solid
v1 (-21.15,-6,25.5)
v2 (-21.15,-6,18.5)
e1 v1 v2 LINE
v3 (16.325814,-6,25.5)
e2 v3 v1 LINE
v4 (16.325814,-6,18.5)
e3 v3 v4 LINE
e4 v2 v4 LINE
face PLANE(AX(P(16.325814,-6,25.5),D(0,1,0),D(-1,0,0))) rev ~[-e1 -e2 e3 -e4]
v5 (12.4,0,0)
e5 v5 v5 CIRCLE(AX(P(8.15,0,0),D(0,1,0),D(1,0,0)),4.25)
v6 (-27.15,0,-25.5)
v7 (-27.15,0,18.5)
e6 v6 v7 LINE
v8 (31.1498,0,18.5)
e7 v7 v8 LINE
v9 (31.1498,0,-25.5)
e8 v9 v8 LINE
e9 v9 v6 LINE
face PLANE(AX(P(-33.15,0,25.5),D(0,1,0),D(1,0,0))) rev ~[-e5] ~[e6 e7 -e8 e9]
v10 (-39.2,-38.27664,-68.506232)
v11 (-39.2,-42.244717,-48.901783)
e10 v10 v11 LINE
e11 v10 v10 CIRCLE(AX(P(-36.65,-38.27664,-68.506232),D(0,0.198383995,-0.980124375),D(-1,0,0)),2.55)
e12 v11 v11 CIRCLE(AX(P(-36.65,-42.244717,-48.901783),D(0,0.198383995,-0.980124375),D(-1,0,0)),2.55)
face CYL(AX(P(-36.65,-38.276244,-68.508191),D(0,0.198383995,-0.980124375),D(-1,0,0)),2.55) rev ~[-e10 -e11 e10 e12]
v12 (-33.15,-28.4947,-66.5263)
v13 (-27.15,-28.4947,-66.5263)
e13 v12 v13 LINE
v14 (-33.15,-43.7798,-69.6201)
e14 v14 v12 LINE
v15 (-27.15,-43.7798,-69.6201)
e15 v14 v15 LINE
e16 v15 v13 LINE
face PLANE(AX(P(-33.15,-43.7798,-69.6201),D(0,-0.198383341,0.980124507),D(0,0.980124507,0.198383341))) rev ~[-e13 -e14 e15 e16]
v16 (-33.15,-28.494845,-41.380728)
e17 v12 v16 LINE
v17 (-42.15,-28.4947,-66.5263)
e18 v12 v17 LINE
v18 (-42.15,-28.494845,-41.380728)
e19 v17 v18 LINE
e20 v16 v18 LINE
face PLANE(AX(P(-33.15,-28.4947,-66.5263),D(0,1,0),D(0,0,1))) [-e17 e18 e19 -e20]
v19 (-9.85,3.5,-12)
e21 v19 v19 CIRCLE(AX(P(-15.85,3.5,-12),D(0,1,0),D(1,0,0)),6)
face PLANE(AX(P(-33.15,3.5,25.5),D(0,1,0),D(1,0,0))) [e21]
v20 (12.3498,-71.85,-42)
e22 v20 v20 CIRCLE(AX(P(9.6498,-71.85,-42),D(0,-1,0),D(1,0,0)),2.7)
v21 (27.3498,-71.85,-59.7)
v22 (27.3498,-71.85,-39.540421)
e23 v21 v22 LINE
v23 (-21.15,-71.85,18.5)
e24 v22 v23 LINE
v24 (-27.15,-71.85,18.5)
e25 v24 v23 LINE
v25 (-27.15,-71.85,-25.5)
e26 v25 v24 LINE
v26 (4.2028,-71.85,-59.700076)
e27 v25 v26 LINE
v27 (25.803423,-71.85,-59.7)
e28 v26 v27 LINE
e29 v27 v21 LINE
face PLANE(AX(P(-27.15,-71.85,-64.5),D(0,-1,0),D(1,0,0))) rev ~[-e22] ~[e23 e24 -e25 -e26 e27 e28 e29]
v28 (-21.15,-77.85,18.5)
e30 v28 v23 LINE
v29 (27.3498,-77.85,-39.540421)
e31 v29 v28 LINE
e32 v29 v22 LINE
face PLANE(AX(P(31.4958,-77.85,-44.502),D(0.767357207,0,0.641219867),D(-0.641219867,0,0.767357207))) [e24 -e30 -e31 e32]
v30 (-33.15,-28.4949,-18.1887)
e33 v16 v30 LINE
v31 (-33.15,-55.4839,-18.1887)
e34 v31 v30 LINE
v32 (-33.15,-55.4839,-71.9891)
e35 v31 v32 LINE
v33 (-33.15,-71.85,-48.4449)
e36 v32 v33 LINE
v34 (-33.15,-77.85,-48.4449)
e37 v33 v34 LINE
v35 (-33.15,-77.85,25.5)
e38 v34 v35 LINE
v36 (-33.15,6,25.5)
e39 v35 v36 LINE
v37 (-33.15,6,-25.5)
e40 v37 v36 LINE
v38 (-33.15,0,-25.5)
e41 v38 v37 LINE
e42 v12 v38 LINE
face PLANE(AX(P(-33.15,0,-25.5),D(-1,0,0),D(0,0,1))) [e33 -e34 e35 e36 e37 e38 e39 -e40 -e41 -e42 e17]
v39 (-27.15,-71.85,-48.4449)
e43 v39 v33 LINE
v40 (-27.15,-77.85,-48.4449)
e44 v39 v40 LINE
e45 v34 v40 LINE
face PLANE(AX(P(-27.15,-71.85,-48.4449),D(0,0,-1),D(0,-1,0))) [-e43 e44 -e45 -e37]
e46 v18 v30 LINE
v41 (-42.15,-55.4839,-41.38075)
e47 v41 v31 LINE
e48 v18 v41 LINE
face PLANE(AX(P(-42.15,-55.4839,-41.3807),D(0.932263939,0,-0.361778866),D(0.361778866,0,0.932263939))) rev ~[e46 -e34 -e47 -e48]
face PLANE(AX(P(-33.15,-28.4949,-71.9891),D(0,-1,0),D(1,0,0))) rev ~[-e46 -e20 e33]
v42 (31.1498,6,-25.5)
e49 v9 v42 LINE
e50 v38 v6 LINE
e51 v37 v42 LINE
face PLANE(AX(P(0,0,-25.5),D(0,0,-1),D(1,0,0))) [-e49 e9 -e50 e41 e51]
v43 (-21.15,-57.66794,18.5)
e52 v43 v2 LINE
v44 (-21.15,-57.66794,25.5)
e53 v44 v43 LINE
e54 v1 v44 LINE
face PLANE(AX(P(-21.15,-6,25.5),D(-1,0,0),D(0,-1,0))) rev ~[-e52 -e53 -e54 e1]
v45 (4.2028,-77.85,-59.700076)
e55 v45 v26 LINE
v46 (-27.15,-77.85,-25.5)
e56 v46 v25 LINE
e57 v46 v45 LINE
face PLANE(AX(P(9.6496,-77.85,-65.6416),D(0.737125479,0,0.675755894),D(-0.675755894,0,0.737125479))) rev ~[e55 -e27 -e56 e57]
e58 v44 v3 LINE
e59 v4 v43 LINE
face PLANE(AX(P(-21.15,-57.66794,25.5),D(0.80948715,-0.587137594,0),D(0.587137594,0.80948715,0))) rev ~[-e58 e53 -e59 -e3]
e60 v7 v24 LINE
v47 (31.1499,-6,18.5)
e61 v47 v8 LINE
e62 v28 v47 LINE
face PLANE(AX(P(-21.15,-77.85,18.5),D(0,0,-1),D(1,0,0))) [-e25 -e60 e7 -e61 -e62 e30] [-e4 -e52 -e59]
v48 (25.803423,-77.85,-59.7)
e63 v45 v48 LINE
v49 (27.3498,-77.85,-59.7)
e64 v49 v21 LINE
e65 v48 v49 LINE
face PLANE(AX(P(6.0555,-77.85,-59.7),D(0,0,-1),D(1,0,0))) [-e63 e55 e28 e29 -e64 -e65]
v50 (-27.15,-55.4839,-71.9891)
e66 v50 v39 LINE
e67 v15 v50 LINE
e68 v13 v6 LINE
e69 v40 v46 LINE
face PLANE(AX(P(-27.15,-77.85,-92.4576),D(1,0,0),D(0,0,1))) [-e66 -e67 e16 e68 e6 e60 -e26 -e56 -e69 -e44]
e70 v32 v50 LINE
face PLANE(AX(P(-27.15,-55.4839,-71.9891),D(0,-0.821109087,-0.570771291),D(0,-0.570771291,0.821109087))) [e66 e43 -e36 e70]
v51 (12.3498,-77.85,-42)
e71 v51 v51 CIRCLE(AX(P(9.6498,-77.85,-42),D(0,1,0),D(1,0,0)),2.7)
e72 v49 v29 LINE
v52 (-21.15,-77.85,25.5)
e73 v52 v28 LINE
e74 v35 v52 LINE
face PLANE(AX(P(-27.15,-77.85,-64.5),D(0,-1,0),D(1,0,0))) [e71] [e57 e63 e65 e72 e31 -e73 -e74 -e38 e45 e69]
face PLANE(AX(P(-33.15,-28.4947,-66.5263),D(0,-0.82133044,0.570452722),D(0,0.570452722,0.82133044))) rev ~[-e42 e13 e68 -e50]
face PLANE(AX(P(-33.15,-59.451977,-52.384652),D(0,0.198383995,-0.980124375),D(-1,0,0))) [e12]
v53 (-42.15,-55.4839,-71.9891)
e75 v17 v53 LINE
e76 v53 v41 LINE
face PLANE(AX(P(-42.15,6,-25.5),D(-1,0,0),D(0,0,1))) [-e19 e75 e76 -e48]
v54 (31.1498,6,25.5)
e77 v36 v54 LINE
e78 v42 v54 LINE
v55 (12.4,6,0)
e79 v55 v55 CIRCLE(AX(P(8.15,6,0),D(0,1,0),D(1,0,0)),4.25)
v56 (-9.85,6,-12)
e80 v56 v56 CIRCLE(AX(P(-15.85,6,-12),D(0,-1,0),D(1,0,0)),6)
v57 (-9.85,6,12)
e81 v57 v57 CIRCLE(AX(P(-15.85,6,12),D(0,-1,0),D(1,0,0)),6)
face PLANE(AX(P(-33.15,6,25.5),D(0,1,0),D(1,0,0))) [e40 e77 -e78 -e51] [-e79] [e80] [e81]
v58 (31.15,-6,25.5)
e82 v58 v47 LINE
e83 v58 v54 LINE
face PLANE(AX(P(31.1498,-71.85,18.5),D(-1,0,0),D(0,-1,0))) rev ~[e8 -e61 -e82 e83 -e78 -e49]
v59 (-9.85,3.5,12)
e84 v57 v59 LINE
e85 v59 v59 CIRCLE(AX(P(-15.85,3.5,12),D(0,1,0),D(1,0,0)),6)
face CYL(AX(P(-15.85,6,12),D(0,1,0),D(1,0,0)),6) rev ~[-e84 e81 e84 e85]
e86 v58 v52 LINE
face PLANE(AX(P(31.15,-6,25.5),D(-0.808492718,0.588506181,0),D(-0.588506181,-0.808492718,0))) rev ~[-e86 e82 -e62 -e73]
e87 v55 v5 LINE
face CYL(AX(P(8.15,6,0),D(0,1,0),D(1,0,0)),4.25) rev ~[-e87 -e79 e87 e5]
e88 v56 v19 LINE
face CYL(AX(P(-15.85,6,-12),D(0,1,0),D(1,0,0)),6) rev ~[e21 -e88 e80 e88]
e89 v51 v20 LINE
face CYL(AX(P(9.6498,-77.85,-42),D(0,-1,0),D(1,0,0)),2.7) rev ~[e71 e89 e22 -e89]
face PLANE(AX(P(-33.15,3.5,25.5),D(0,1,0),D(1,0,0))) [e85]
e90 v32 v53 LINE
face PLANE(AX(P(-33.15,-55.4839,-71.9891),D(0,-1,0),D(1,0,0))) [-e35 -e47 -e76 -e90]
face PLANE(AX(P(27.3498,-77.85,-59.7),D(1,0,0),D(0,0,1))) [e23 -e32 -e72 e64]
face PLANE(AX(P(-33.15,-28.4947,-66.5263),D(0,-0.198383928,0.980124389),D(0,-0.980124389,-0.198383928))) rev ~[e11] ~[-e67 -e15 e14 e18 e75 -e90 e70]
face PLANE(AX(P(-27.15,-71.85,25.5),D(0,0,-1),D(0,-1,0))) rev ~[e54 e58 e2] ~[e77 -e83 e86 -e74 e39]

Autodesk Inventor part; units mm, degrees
ref_plane "YZ Plane" through (0, 0, 0) normal (1, 0, 0) x (0, 1, 0)
ref_plane "XZ Plane" through (0, 0, 0) normal (0, 1, 0) x (-1, 0, 0)
ref_plane "XY Plane" through (0, 0, 0) normal (0, 0, 1) x (1, 0, 0)
sketch "Sketch1" plane through (0, 0, 0) normal (0, 1, 0) x (-1, 0, 0)
  line L0 (0, -25.5) -> (-34.15, -25.5)
  line L1 (-34.15, -25.5) -> (-34.15, 0)
  line L2 (-34.15, 0) -> (-34.15, 25.5)
  line L3 (-34.15, 25.5) -> (0, 25.5)
  line L4 (0, 25.5) -> (34.15, 25.5)
  line L5 (34.15, 25.5) -> (34.15, 0)
  line L6 (34.15, 0) -> (34.15, -25.5)
  line L7 (34.15, -25.5) -> (0, -25.5)
  point P0 (0, 0)
extrude "Extrusion1" add sketch "Sketch1" along normal blind 7
sketch "Sketch3" plane through (-34.15, 0, 25.5) normal (0, 0, 1) x (1, 0, 0)
  line L0 (0, 0) -> (0, -78.85)
  point P0 (34.15, 0)
  dimension "d7" = 78.85
sketch "Sketch4" plane through (-34.15, 0, -25.5) normal (-1, 0, 0) x (0, 0, 1)
  line L0 (51, 0) -> (51, -78.85)
  line L1 (51, -78.85) -> (-39, -78.85)
  line L2 (-39, -78.85) -> (-39, -71.85)
  line L3 (0, 0) -> (-39, -71.85)
  line L4 (0, 0) -> (51, 0)
  point P0 (25.5, 0)
  dimension "d10" = 90
  dimension "d11" = 7
extrude "Extrusion2" add sketch "Sketch4" against normal blind 7
sketch "Sketch6" plane through (0, 7, 0) normal (0, 1, 0) x (1, 0, 0)
  line L0 (34.15, -25.5) -> (34.15, 25.5) projected
  line L1 (34.15, 25.5) -> (34.15, 0)
  line L2 (-34.15, 25.5) -> (-34.15, -25.5) projected
  circle A0 centre (8.15, 0) radius 5
  point P0 (0, 0)
  dimension "d20" = 10
extrude "Extrusion4" cut sketch "Sketch6" against normal blind 10
sketch "Sketch7" plane through (-27.15, 0, -25.5) normal (1, 0, 0) x (0, 0, -1)
  line L0 (-51, -78.85) -> (39, -78.85) projected
  line L1 (-51, -78.85) -> (39, -78.85)
  line L2 (39, -78.85) -> (39, -71.85) projected
  line L3 (39, -78.85) -> (39, -71.85)
  line L4 (39, -71.85) -> (-51, -71.85)
  line L5 (-51, 0) -> (-51, -78.85) projected
  line L6 (-51, -78.85) -> (-51, -71.85)
  point P0 (-25.5, 0)
sketch "Sketch8" plane through (0, 0, 0) normal (0, -1, 0) x (1, 0, 0)
  circle A0 centre (8.15, 0) radius 5 projected
  line L0 (8.15, 18.5) -> (34.15, 18.5)
  line L1 (34.15, 25.5) -> (34.15, -25.5) projected
  line L2 (8.15, 25.5) -> (34.15, 25.5)
  line L3 (8.15, 25.5) -> (-27.15, 25.5)
  line L4 (-27.15, 25.5) -> (-27.15, -25.5) projected
  line L5 (8.15, 18.5) -> (-27.15, 18.5)
  line L6 (34.15, 25.5) -> (34.15, 18.5)
  line L7 (-27.15, 25.5) -> (-27.15, 18.5)
  point P0 (0, 0)
extrude "Extrusion6" add sketch "Sketch7" along normal blind 58.5
extrude "Extrusion7" add sketch "Sketch8" along normal blind 78.75 contours L5 L4 L3 L2 L1 L0
sketch "Sketch9" plane through (31.35, 0, -25.5) normal (1, 0, 0) x (0, 0, -1)
  line L0 (-51, -78.75) -> (-51, 7) projected
  line L1 (-44, 0) -> (-44, -71.85) projected
  line L2 (-51, -78.75) -> (-44, -78.75)
  line L3 (-44, -78.75) -> (-44, -71.85)
  line L4 (-44, -71.85) -> (-51, -71.85)
  line L5 (-51, -71.85) -> (-51, -78.75)
  point P0 (-25.5, 0)
extrude "Extrusion8" cut sketch "Sketch9" along normal blind 10
sketch "Sketch10" plane through (0, 7, 0) normal (0, 1, 0) x (1, 0, 0)
  point P0 (0, 0)
sketch "Boceto11" plane through (-34.15, -78.85, -64.5) normal (0, -1, 0) x (1, 0, 0)
  line L0 (72.0718, 89.9914) -> (72.0718, 37.9883)
  line L1 (72.0718, 37.9883) -> (65.5278, 37.9883)
  line L2 (65.5278, 37.9883) -> (65.5278, 89.9914)
  line L3 (72.0718, 89.9914) -> (72.0718, 92.1751)
  line L4 (72.0718, 92.1751) -> (65.5278, 92.1751)
  line L5 (65.5278, 92.1751) -> (65.5278, 89.9914)
  point P0 (34.15, 64.5)
extrude "Extrusión9" cut sketch "Boceto11" against normal blind 1000
sketch "Boceto18" plane through (-34.15, -78.85, 25.5) normal (0, 0, 1) x (1, 0, 0)
  point P0 (34.15, 78.85)
sketch "Boceto23" plane through (-27.15, 0, -25.5) normal (0, 0.4770514, -0.8788754) x (-1, 0, 0)
  point P0 (-27.15, 12.1648)
sketch "Boceto24" plane through (-27.15, 0, -25.5) normal (0, 0, -1) x (-1, 0, 0)
  line L0 (7, -71.85) -> (7, -78.85) projected
  line L1 (7, -78.35) -> (7, -78.85)
  line L2 (7, -78.85) -> (-58.5, -78.85) projected
  line L3 (-58.5, -78.85) -> (-58.5, -77.85)
  line L4 (-58.5, -71.85) -> (-58.5, -78.85) projected
  line L5 (-58.5, -77.85) -> (6, -77.85)
  line L6 (7, -77.85) -> (7, -78.85)
  line L7 (7, -78.85) -> (-58.8392, -78.85)
  line L8 (-58.5278, 7) -> (7, 7) projected
  line L9 (7, -78.85) -> (7, 7)
  line L10 (7, 7) -> (6, 7)
  line L11 (6, 6) -> (6, -77.85)
  line L12 (-58.5278, -71.85) -> (-58.5278, 7) projected
  line L13 (-58.5278, 7) -> (-58.5278, 6)
  line L14 (-58.5278, 6) -> (6, 6)
  line L15 (7, 0) -> (7, 7) projected
  line L16 (7, 6) -> (7, 7)
  line L17 (7, 7) -> (-58.5278, 7)
  point P0 (-27.15, 0)
  dimension "d65" = 1
  dimension "d66" = 1
  dimension "d67" = 1
extrude "Extrusión19" cut sketch "Boceto24" along normal mid plane 1000
sketch "Boceto25" plane through (31.35, -71.85, -64.5) normal (0, 0, -1) x (-1, 0, 0)
  point P0 (31.35, 71.85)
sketch "Boceto27" plane through (31.3778, 0, -25.5) normal (0, 0, -1) x (-1, 0, 0)
  line L0 (0, -71.85) -> (0, 6) projected
  line L1 (0, 6) -> (0.228, 6)
  line L2 (0, 6) -> (64.5278, 6) projected
  line L3 (0.228, 6) -> (0.228, -77.85)
  line L4 (0.0278, -77.85) -> (64.5278, -77.85) projected
  line L5 (0.0278, -71.85) -> (0.0278, -77.85) projected
  line L6 (0.228, -77.85) -> (0.0278, -77.85)
  line L7 (0.0278, -77.85) -> (0, 6)
  line L8 (0, 6) -> (0, -77.85)
  line L9 (0, -77.85) -> (0.0278, -77.85)
  point P0 (31.3778, 0)
  dimension "d73" = 0.228
extrude "Extrusión21" cut sketch "Boceto27" along normal mid plane 1000
sketch "Boceto28" plane through (-33.15, 0, -25.5) normal (-1, 0, 0) x (0, 0, 1)
  point P0 (25.5, 0)
sketch "Boceto30" plane through (-33.15, 0, -25.5) normal (-1, 0, 0) x (0, 0, 1)
  point P0 (25.5, 0)
sketch "Boceto31" plane through (-33.15, 0, -25.5) normal (-1, 0, 0) x (0, 0, 1)
  circle A0 centre (64.38, -38.5153) radius 2.6
  point P0 (25.5, 0)
  point P1 (64.38, -49.4573)
sketch "Boceto32" plane through (-27.15, -71.85, 18.5) normal (0, 1, 0) x (1, 0, 0)
  circle A0 centre (47, 71.5) radius 5 projected
  circle A1 centre (47, 71.5) radius 5
  line L0 (52, 71.5) -> (58.2998, 71.5)
  line L1 (67, 83) -> (67, -7)
  line L2 (58.2998, -7) -> (-6, -7) projected
  line L3 (67, -7) -> (58.2998, -7)
  line L4 (58.2998, -7) -> (58.2998, 83)
  line L5 (47, 76.5) -> (47, 83)
  line L6 (-6, 83) -> (0, 83) projected
  line L7 (-6, 83) -> (-6, 91.5)
  line L8 (-6, 91.5) -> (67, 91.5)
  line L9 (67, 91.5) -> (67, 83)
  line L10 (-6, 83) -> (58.2998, 83)
  point P0 (27.15, 18.5)
extrude "Extrusión23" add sketch "Boceto32" against normal blind 6 contours L4 L10 L6 L7 L8 L9 L1 L3
sketch "Boceto33" plane through (-33.15, -77.85, 25.5) normal (-1, 0, 0) x (0, 0, 1)
  line L0 (0, 83.85) -> (0, 0) projected
  line L1 (0, 74.4354) -> (10.1255, 74.4354)
  line L2 (10.1255, 74.4354) -> (10.1255, 56.6115)
  line L3 (10.9445, 54.9975) -> (18.0243, 49.8171)
  line L4 (18.8039, 48.5979) -> (20.1084, 42.1205)
  line L5 (0, 11.6181) -> (18.1478, 11.6181)
  line L6 (20.1478, 13.6181) -> (20.1478, 41.7256)
  arc A0 (10.1255, 56.6115) -> (10.9445, 54.9975) centre (12.1255, 56.6115) ccw
  arc A1 (18.8039, 48.5979) -> (18.0243, 49.8171) centre (16.8433, 48.203) ccw
  arc A2 (20.1478, 41.7256) -> (20.1084, 42.1205) centre (18.1478, 41.7256) ccw
  arc A3 (18.1478, 11.6181) -> (20.1478, 13.6181) centre (18.1478, 13.6181) ccw
  point P0 (-25.5, 77.85)
  dimension "d91" = 2
extrude "Extrusión24" add sketch "Boceto33" against normal blind 6
extrude "Extrusión25" cut sketch "Boceto31" against normal blind 6
sketch "Boceto34" plane through (-27.15, -77.85, 25.5) normal (1, 0, 0) x (0, 0, -1)
  line L0 (-18.1478, 11.6181) -> (-21.8775, 11.6181)
  line L1 (-21.8775, 11.6181) -> (-21.8775, 48.067)
  line L2 (-21.8775, 48.067) -> (-10.1255, 56.8358)
  line L3 (-10.1255, 74.4354) -> (-10.1255, 56.6115) projected
  line L4 (-10.1255, 56.8358) -> (-10.1255, 48.9642)
  line L5 (-10.1255, 48.9642) -> (-16.6729, 42.1735)
  line L6 (-16.6729, 42.1735) -> (-18.1478, 11.6181)
  point P0 (25.5, 77.85)
extrude "Extrusión26" add sketch "Boceto34" against normal blind 6
fillet "Empalme5" radius 10 3 edges at (-30.15, -21.0142, 35.6255) (-30.15, -29.783, 47.3775) (-30.15, -66.2319, 47.3775)
sketch "Boceto37" plane through (-33.15, 6, 25.5) normal (0, 1, 0) x (1, 0, 0)
  circle A0 centre (41.3, 25.5) radius 6 projected
  line L0 (41.3, 25.5) -> (17.3, 25.5)
  line L1 (17.3, 25.5) -> (17.3, 13.5)
  line L2 (17.3, 13.5) -> (17.3, 37.5)
  circle A1 centre (17.3, 13.5) radius 6
  circle A2 centre (17.3, 37.5) radius 6
  point P0 (33.15, 25.5)
  dimension "d106" = 24
  dimension "d107" = 12
  dimension "d108" = 24
  dimension "d109" = 12
  dimension "d110" = 12
extrude "Extrusión29" cut sketch "Boceto37" against normal blind 2.5 contours A1 | A2
sketch "Boceto39" plane through (-27.15, -71.85, 18.5) normal (0, 1, 0) x (1, 0, 0)
  line L0 (58.2998, -7) -> (58.2998, 0)
  line L1 (58.2998, 44) -> (58.2998, 91.5)
  line L2 (-6, 91.5) -> (67, 91.5) projected
  line L3 (0, 0) -> (58.2998, 0) projected
  line L4 (58.2998, 0) -> (58.2998, -7) projected
  line L5 (58.2998, -7) -> (67, -7) projected
  line L6 (58.2998, -7) -> (67, -7)
  line L7 (67, 91.5) -> (-6, 91.5) projected
  line L8 (67, -7) -> (67, 91.5)
  line L9 (67, 91.5) -> (58.2998, 91.5)
  line L10 (58.2998, 0) -> (58.2998, 44)
  point P0 (27.15, 18.5)
extrude "Extrusión31" cut sketch "Boceto39" against normal blind 10
sketch "Boceto41" plane through (-27.15, -71.85, 18.5) normal (0, 1, 0) x (1, 0, 0)
  line L0 (58.2998, 91.5) -> (58.2998, -7) projected
  line L1 (58.2998, 91.5) -> (31.7998, 91.5)
  line L2 (31.7998, 91.5) -> (31.7998, 65)
  line L3 (31.7998, 65) -> (58.2998, 65)
  line L4 (58.2998, 65) -> (58.2998, 91.5)
  circle A0 centre (31.7998, 65) radius 6
  point P0 (27.15, 18.5)
  dimension "d124" = 26.5
  dimension "d125" = 26.5
  dimension "d126" = 12
extrude "Extrusión32" cut sketch "Boceto41" against normal blind 10 contours A0 L2 L3 | L3 L2 A0
sketch "Sketch42" plane through (-27.15, -71.85, 18.5) normal (0, 1, 0) x (1, 0, 0)
  circle A0 centre (31.7998, 65) radius 6 projected
  line L0 (31.7998, 71) -> (31.7998, 65)
  circle A1 centre (31.7998, 65) radius 18
  line L1 (0, 0) -> (0, 83) projected
  line L2 (0, 83) -> (31.7998, 83)
  line L3 (58.2998, 91.5) -> (-6, 91.5) projected
  line L4 (49.7998, 65) -> (49.7998, 0)
  line L5 (58.2998, 0) -> (0, 0) projected
  line L6 (0, 0) -> (58.2998, 0) projected
  line L7 (49.7998, 0) -> (58.2998, 0)
  line L8 (58.2998, 91.5) -> (58.2998, -7) projected
  line L9 (58.2998, 0) -> (58.2998, 91.5)
  line L10 (0, 83) -> (0, 44) projected
  line L11 (0, 83) -> (-6, 83)
  line L12 (-6, 91.5) -> (-6, 83) projected
  line L13 (-6, 83) -> (-6, 91.5)
  line L14 (58.2998, 91.5) -> (58.2998, 0) projected
  line L15 (-6, 91.5) -> (58.2998, 91.5)
  point P0 (27.15, 18.5)
  point P1 (58.2998, -7)
  dimension "d129" = 36
extrude "Extrusion33" cut sketch "Sketch42" against normal blind 10 contours A1 L2 L11 L12 L3 L8 L5 L4
sketch "Sketch43" plane through (-27.15, -71.85, 18.5) normal (0, 0, -1) x (-1, 0, 0)
  line L0 (6, -6) -> (-58.2998, -6) projected
  line L1 (0, 0) -> (-49.7998, 0) projected
  line L2 (-58.2998, -6) -> (-49.7998, -6)
  line L3 (-49.7998, -6) -> (-49.7998, 0)
  line L4 (-49.7998, 0) -> (-58.2998, 0)
  line L5 (-58.2998, 0) -> (-58.2998, -6)
  point P0 (-27.15, 71.85)
extrude "Extrusion34" add sketch "Sketch43" along normal blind 20
fillet "Fillet7" radius 7 1 edges at (31.1498, -74.85, -1.5)
fillet "Fillet8" radius 2 1 edges at (22.6498, -74.85, -1.5)
sketch "Sketch44" plane through (-33.15, 0, -25.5) normal (-1, 0, 0) x (0, 0, 1)
  line L0 (68.8577, -26.7837) -> (65.1452, -24.0136) projected
  line L1 (61.1255, -3.4146) -> (51, -3.4146) projected
  line L2 (65.1452, -24.0136) -> (51, -24.0136)
  line L3 (51, -24.0136) -> (51, -3.4146)
  line L4 (51, -3.4146) -> (65.1452, -3.4146)
  line L5 (65.1452, -3.4146) -> (65.1452, -24.0136)
  point P0 (25.5, 0)
extrude "Extrusion35" cut sketch "Sketch44" against normal blind 20
sketch "Sketch45" plane through (-33.15, 6, 25.5) normal (0, 1, 0) x (1, 0, 0)
  circle A0 centre (41.3, 25.5) radius 5 projected
  circle A1 centre (41.3, 25.5) radius 4.25
  circle A2 centre (41.3, 25.5) radius 5
  point P0 (33.15, 25.5)
  dimension "d138" = 8.5
extrude "Extrusion36" add sketch "Sketch45" against normal blind 6
sketch "Sketch46" plane through (-33.15, 0, -25.5) normal (-1, 0, 0) x (0, 0, 1)
  point P0 (25.5, 0)
sketch "Sketch47" plane through (-33.15, 0, -25.5) normal (-1, 0, 0) x (0, 0, 1)
  line L0 (-44.1201, -43.7798) -> (-41.0263, -28.4947)
  line L1 (-39, -71.85) -> (0, 0) projected
  line L2 (-41.0263, -28.4947) -> (0, 0)
  line L3 (0, 0) -> (-39, -71.85)
  line L4 (-44.1201, -43.7798) -> (-44.1201, -71.85)
  line L5 (-44.1201, -71.85) -> (-39, -71.85)
  point P0 (25.5, 0)
extrude "Extrusion37" add sketch "Sketch47" against normal blind 6
sketch "Sketch48" plane through (-33.15, 6, -25.5) normal (-1, 0, 0) x (0, 0, 1)
  point P0 (25.5, -6)
sketch "Sketch49" plane through (-33.15, 6, -25.5) normal (-1, 0, 0) x (0, 0, 1)
  point P0 (25.5, -6)
sketch "Sketch50" plane through (-33.15, 6, -25.5) normal (-1, 0, 0) x (0, 0, 1)
  line L0 (-44.1201, -49.7798) -> (-41.0263, -34.4947) projected
  line L1 (-41.0263, -34.4947) -> (-46.4891, -61.4839)
  line L2 (-39, -83.85) -> (51, -83.85) projected
  line L3 (-39, -83.85) -> (-46.4891, -83.85)
  line L4 (-46.4891, -83.85) -> (-46.4891, -61.4839)
  line L5 (-41.0263, -34.4947) -> (-39, -69.2782)
  line L6 (-39, -69.2782) -> (-39, -83.85)
  point P0 (25.5, -6)
extrude "Extrusion38" add sketch "Sketch50" against normal blind 6
sketch "Sketch51" plane through (-33.15, 6, -25.5) normal (-1, 0, 0) x (0, 0, 1)
  line L0 (-41.0263, -34.4947) -> (-46.4891, -61.4839) projected
  line L1 (-41.0263, -34.4947) -> (-46.4891, -61.4839)
  line L2 (-46.4891, -61.4839) -> (-15.8808, -61.4839)
  line L3 (-41.0263, -34.4947) -> (-15.8808, -34.4947)
  line L4 (-15.8808, -34.4947) -> (-15.8808, -61.4839)
  point P0 (25.5, -6)
extrude "Extrusion39" add sketch "Sketch51" along normal blind 9
sketch "Sketch52" plane through (-33.15, -55.4839, -71.9891) normal (0, -1, 0) x (1, 0, 0)
  line L0 (-9, 30.6084) -> (0, 53.8004)
  line L1 (0, 0) -> (0, 97.4891) projected
  line L2 (0, 30.6084) -> (0, 53.8004)
  line L3 (0, 30.6084) -> (-9, 30.6084)
  point P0 (33.15, 71.9891)
extrude "Extrusion40" add sketch "Sketch52" against normal blind 26.989
sketch "Sketch53" plane through (-33.15, -55.4839, -18.1887) normal (-0.9322642, 0, 0.3617781) x (0.3617781, 0, 0.9322642)
  point P0 (28.9496, 55.4839)
sketch "Sketch54" plane through (-33.15, 6, -25.5) normal (-1, 0, 0) x (0, 0, 1)
  line L0 (51, -72.2319) -> (51, -83.85) projected
  line L1 (51, -83.85) -> (86.3988, -83.85)
  line L2 (86.3988, -83.85) -> (86.3988, -18.2813)
  line L3 (86.3988, -18.2813) -> (51, -18.2813)
  line L4 (51, -18.2813) -> (51, -83.85)
  point P0 (25.5, -6)
extrude "Extrusion41" cut sketch "Sketch54" against normal blind 26.989
sketch "Sketch55" plane through (-33.15, -55.4839, -71.9891) normal (0, 0.198384, -0.9801244) x (-1, 0, 0)
  line L0 (9, 6.0722) -> (9, 32.5248) projected
  line L1 (9, 17.5562) -> (3.5, 17.5562)
  line L2 (9, 17.5562) -> (14.5, 17.5562) construction
  circle A0 centre (3.5, 17.5562) radius 2.55
  point P0 (-33.15, 68.6627)
  dimension "d153" = 5.5
  dimension "d154" = 180
  dimension "d155" = 5.1
extrude "Extrusion42" cut sketch "Sketch55" against normal blind 20
sketch "Sketch56" plane through (-33.15, -77.85, 25.5) normal (0, 0, 1) x (1, 0, 0)
  line L0 (0, 77.85) -> (0, 83.85) projected
  line L1 (0, 83.85) -> (12, 83.85)
  line L2 (64.2998, 83.85) -> (0, 83.85) projected
  line L3 (12, 83.85) -> (12, 0)
  line L4 (6, 0) -> (37.7998, 0) projected
  line L5 (0, 83.85) -> (0, 0) projected
  line L6 (12, 0) -> (0, 0)
  line L7 (0, 0) -> (0, 83.85)
  line L8 (0, 83.85) -> (12, 83.85)
  line L9 (12, 83.85) -> (12, 0)
  line L10 (0, 83.85) -> (64.3, 83.85)
  line L11 (64.3, 83.85) -> (64.3, 71.85)
  line L12 (64.3, 71.85) -> (0, 71.85)
  line L13 (0, 71.85) -> (0, 83.85)
  line L14 (64.2998, 0) -> (64.2998, 83.85) projected
  line L15 (64.3, 71.85) -> (12, 0)
  line L16 (64.3, 71.85) -> (54.5981, 78.9121)
  line L17 (12, 0) -> (3.5198, 8.4904)
  line L18 (3.5198, 8.4904) -> (54.5981, 78.9121)
  line L19 (12, 0) -> (64.2998, 0)
  line L20 (64.3, 71.85) -> (64.2998, 0)
  point P0 (33.15, 77.85)
  point P1 (37.7998, 0)
  point P2 (64.2998, 71.8497)
  point P3 (12, 20.182)
  point P4 (49.4758, 71.85)
  point P5 (12, 71.85)
  dimension "d158" = 12
  dimension "d159" = 64.3
  dimension "d160" = 12
  dimension "d161" = 12
  dimension "d162" = 12
extrude "Extrusion43" cut sketch "Sketch56" against normal blind 20 contours L12 L18 L3 | L14 L19 L4 L15
sketch "Sketch57" plane through (-27.15, -77.85, -64.5) normal (0, -1, 0) x (1, 0, 0)
  point P0 (27.15, 64.5)
sketch "Sketch58" plane through (-27.15, -77.85, -64.5) normal (0, -1, 0) x (1, 0, 0)
  line L0 (0.0098, 82.9715) -> (6.0098, 82.9715)
  line L1 (0.0098, 82.9715) -> (58.6458, 82.9715)
  line L2 (58.6458, 82.9715) -> (58.6458, -19.949)
  line L3 (58.6458, -19.949) -> (0.0098, -19.949)
  line L4 (0.0098, -19.949) -> (0.0098, 82.9715)
  line L5 (58.6458, 1.7715) -> (22.1928, 1.7715)
  line L6 (22.1928, 1.7715) -> (0.0098, 16.0551)
  line L7 (0.0098, 16.0551) -> (0.0098, 82.9715)
  line L8 (58.6458, 1.7715) -> (58.6458, 39.0076)
  line L9 (58.6458, 1.7715) -> (22.1928, 1.7715)
  line L10 (58.6458, 38.2245) -> (58.6458, 1.7715)
  line L11 (58.6458, 38.2245) -> (6.0098, 82.9715)
  point P0 (15.0563, 101.6492)
extrude "Extrusion44" add sketch "Sketch58" against normal blind 6
extrude "Extrusion45" cut sketch "Sketch58" against normal blind 6
extrude "Extrusion46" add sketch "Sketch58" against normal blind 6 contours L0 L11 L2 L5 L6 L4
sketch "Sketch59" plane through (-27.15, 0, -25.5) normal (1, 0, 0) x (0, 0, -1)
  line L0 (46.4891, -77.85) -> (46.4891, -55.4839) projected
  line L1 (22.9449, -71.85) -> (22.9449, -77.85) projected
  line L2 (46.4891, -55.4839) -> (22.9449, -71.85)
  line L3 (22.9449, -71.85) -> (22.9449, -77.85)
  line L4 (22.9449, -77.85) -> (46.4891, -77.85)
  line L5 (46.4891, -55.4839) -> (46.4891, -77.85) projected
  line L6 (46.4891, -77.85) -> (46.4891, -55.4839)
  line L7 (46.4891, -55.4839) -> (46.4891, -77.85)
  point P0 (-25.5, 0)
extrude "Extrusion47" cut sketch "Sketch59" along normal blind 0.1 and the other way blind 6
sketch "Sketch60" plane through (-4.9572, -77.85, -62.7285) normal (0, -1, 0) x (1, 0, 0)
  line L0 (36.107, 88.2285) -> (-22.1928, 88.2285) projected
  line L1 (36.107, 88.2285) -> (14.607, 88.2285)
  line L2 (14.607, 88.2285) -> (14.607, 20.7285)
  line L3 (14.607, 20.7285) -> (36.107, 20.7285)
  line L4 (36.107, 20.7285) -> (36.107, 88.2285)
  circle A0 centre (14.607, 20.7285) radius 2.7
  point P0 (4.9572, 62.7285)
  dimension "d176" = 21.5
  dimension "d177" = 67.5
  dimension "d178" = 5.4
extrude "Extrusion48" cut sketch "Sketch60" against normal blind 10 contours A0 L3 L2 | L2 L3 A0
sketch "Sketch61" plane through (-33.15, -77.85, 25.5) normal (0, -1, 0) x (1, 0, 0)
  line L0 (64.6458, -51.7755) -> (64.6458, -88.2285) projected
  line L1 (64.6458, -88.2285) -> (64.6458, -70.002)
  line L2 (12, -7) -> (49.4758, -7) projected
  line L3 (64.6458, -70.002) -> (12, -7)
  line L4 (12, -7) -> (64.6458, -48.437)
  line L5 (64.6458, -48.437) -> (64.6458, -70.002)
  line L6 (64.6458, -88.2285) -> (46.4193, -88.2285)
  line L7 (6.1, -74.0029) -> (28.1928, -88.2285) projected
  line L8 (46.4193, -88.2285) -> (28.1928, -88.2285)
  line L9 (28.1928, -88.2285) -> (6.1, -61.7897)
  line L10 (6.1, -61.7897) -> (6.1, -74.0029)
  line L11 (6.1, -74.0029) -> (28.1928, -88.2285)
  point P0 (33.15, -25.5)
  dimension "d181" = 18.2265
  dimension "d182" = 18.2265
extrude "Extrusion49" cut sketch "Sketch61" against normal blind 6
sketch "Sketch62" plane through (-33.15, -28.4947, -66.5263) normal (0, 0.198384, -0.9801244) x (-1, 0, 0)
  point P0 (-33.15, 41.1261)
sketch "Sketch63" plane through (-33.15, -77.85, 25.5) normal (0, -1, 0) x (1, 0, 0)
  line L0 (6, -7) -> (6, -51) projected
  line L1 (6, -7) -> (12, -7) projected
  line L2 (12, -7) -> (64.6458, -70.002)
  circle A0 centre (42.7998, -67.5) radius 2.7 projected
  line L3 (64.6458, -70.002) -> (42.7998, -67.5)
  line L4 (42.7998, -67.5) -> (53.7228, -80.5717)
  line L5 (53.7228, -80.5717) -> (64.6458, -70.002)
  line L6 (53.7228, -80.5717) -> (42.7996, -91.1416)
  line L7 (42.7996, -91.1416) -> (6, -51)
  line L8 (42.7996, -91.1416) -> (64.6458, -91.1416)
  line L9 (64.6458, -91.1416) -> (64.6458, -70.002)
  line L10 (6, -7) -> (73.4518, -7)
  line L11 (73.4518, -7) -> (73.4518, -117.9576)
  line L12 (73.4518, -117.9576) -> (6, -117.9576)
  line L13 (6, -117.9576) -> (6, -7)
  point P0 (33.15, -25.5)
extrude "Extrusion50" cut sketch "Sketch63" against normal blind 6 contours L7 L8 L9 L2 L10 L11 L12 L13
extrude "Extrusion51" add sketch "Sketch63" against normal blind 6 contours L1 L2 L3 A0 L4 L6 L7 L0 | L6 L5 L9 L8 | L5 L4 A0 L3
sketch "Sketch64" plane through (-33.15, -77.85, 25.5) normal (0, -1, 0) x (1, 0, 0)
  circle A0 centre (42.7998, -67.5) radius 2.7 projected
  line L0 (42.7998, -67.5) -> (42.7998, -70.2)
  line L1 (42.7998, -70.2) -> (42.7998, -85.2)
  line L2 (12, -7) -> (49.4758, -7) projected
  line L3 (12, -7) -> (64.6458, -70.002) projected
  line L4 (12, -7) -> (64.6458, -70.002)
  line L5 (64.6458, -70.002) -> (64.6458, -91.1416) projected
  line L6 (64.6458, -70.002) -> (64.6458, -91.1416)
  line L7 (64.6458, -91.1416) -> (42.7998, -91.1416)
  line L8 (6, -7) -> (6, -51) projected
  line L9 (42.7998, -91.1416) -> (6, -51)
  line L10 (42.7998, -85.2) -> (64.6458, -85.2)
  line L11 (45.4998, -67.5) -> (60.4998, -67.5)
  line L12 (60.4998, -67.5) -> (60.4998, -85.2)
  line L13 (60.4998, -67.5) -> (60.4998, -65.0404)
  line L14 (42.7998, -85.2) -> (37.3528, -85.2)
  line L15 (37.3528, -85.2) -> (67.2046, -85.2)
  line L16 (67.2046, -85.2) -> (67.2046, -95.398)
  line L17 (67.2046, -95.398) -> (37.3528, -95.398)
  line L18 (37.3528, -95.398) -> (37.3528, -85.2)
  line L19 (60.4998, -85.2) -> (70.2528, -85.2)
  line L20 (70.2528, -85.2) -> (70.2528, -62.331)
  line L21 (70.2528, -62.331) -> (60.4998, -62.331)
  line L22 (60.4998, -62.331) -> (60.4998, -85.2)
  point P0 (33.15, -25.5)
  dimension "d192" = 15
  dimension "d193" = 15
extrude "Extrusion52" cut sketch "Sketch64" against normal blind 6 contours L13 L3 L5 L10 L12 | L10 L5 L7 L9 L14 | L22 L21 L20 L19 L15 L5 L3 | L9 L7 L5 L15 L16 L17 L18
sketch "Sketch65" plane through (-33.15, -77.85, 25.5) normal (0, -1, 0) x (1, 0, 0)
  line L0 (12, -7) -> (60.4998, -65.0404) projected
  line L1 (60.4998, -65.0404) -> (48.9264, -75.1202)
  line L2 (60.4998, -65.0404) -> (60.4998, -85.2) projected
  line L3 (60.4998, -65.0404) -> (60.4998, -85.2)
  line L4 (48.9264, -75.1202) -> (60.4998, -88.4085)
  line L5 (60.4998, -65.0404) -> (58.8524, -86.517)
  line L6 (58.8524, -86.517) -> (37.3528, -85.2002)
  line L7 (37.3528, -85.2002) -> (48.9264, -75.1202)
  line L8 (58.8524, -86.517) -> (69.5954, -86.517)
  line L9 (69.5954, -86.517) -> (69.5954, -59.5334)
  line L10 (69.5954, -59.5334) -> (58.8524, -59.5334)
  line L11 (58.8524, -59.5334) -> (58.8524, -86.517)
  point P0 (33.15, -25.5)
  point P1 (58.8524, -63.069)
  dimension "d196" = 15.3475
extrude "Extrusion53" cut sketch "Sketch65" against normal blind 6 contours L11 L10 L9 L8 L5 L0
extrude "Extrusion54" add sketch "Sketch65" against normal blind 6 contours L5 L11 L1 | L11 L4 L1 | L6 L7 L4
sketch "Sketch66" plane through (-33.15, -77.85, 25.5) normal (0, -1, 0) x (1, 0, 0)
  line L0 (37.3528, -85.2) -> (60.4998, -85.2)
  line L1 (60.4998, -85.2) -> (60.4998, -65.0404)
  line L2 (60.4998, -65.0404) -> (37.3528, -65.0404)
  line L3 (37.3528, -65.0404) -> (37.3528, -85.2)
  line L4 (74.8766, -52.5753) -> (26.3032, -52.5753)
  line L5 (26.3032, -52.5753) -> (26.3032, -106.4614)
  line L6 (26.3032, -106.4614) -> (74.8766, -106.4614)
  line L7 (74.8766, -106.4614) -> (74.8766, -52.5753)
  line L8 (60.4998, -52.5753) -> (60.4998, -85.2)
  line L9 (26.3032, -85.2) -> (39.2055, -85.2)
  line L10 (60.4998, -65.0404) -> (39.2055, -85.2)
  point P0 (33.15, -25.5)
extrude "Extrusion55" cut sketch "Sketch66" against normal blind 6 contours L0 L1 L8 L4 L7 L6 L5 L9
extrude "Extrusion56" add sketch "Sketch66" against normal blind 6 contours L10 L1 L0
sketch "Sketch67" plane through (-33.15, -77.85, 25.5) normal (0, -1, 0) x (1, 0, 0)
  point P0 (33.15, -25.5)
sketch "Sketch68" plane through (-33.15, -77.85, 25.5) normal (0, -1, 0) x (1, 0, 0)
  line L0 (60.4998, -65.0404) -> (60.4998, -85.2) projected
  line L1 (60.4998, -85.2) -> (37.3526, -85.2) projected
  line L2 (60.4998, -85.2) -> (37.3526, -85.2)
  line L3 (37.3526, -85.2) -> (6, -51)
  line L4 (6, -51) -> (6, -7)
  line L5 (6, -7) -> (12.2668, -7)
  line L6 (12, -7) -> (60.4998, -65.0404) projected
  line L7 (60.4998, -65.0404) -> (12, -7)
  circle A0 centre (42.7998, -67.5) radius 2.7 projected
  circle A1 centre (42.7998, -67.5) radius 2.7
  point P0 (33.15, -25.5)
properties part number "DC23[i3][R][T1]" material "Aluminio 6061"
